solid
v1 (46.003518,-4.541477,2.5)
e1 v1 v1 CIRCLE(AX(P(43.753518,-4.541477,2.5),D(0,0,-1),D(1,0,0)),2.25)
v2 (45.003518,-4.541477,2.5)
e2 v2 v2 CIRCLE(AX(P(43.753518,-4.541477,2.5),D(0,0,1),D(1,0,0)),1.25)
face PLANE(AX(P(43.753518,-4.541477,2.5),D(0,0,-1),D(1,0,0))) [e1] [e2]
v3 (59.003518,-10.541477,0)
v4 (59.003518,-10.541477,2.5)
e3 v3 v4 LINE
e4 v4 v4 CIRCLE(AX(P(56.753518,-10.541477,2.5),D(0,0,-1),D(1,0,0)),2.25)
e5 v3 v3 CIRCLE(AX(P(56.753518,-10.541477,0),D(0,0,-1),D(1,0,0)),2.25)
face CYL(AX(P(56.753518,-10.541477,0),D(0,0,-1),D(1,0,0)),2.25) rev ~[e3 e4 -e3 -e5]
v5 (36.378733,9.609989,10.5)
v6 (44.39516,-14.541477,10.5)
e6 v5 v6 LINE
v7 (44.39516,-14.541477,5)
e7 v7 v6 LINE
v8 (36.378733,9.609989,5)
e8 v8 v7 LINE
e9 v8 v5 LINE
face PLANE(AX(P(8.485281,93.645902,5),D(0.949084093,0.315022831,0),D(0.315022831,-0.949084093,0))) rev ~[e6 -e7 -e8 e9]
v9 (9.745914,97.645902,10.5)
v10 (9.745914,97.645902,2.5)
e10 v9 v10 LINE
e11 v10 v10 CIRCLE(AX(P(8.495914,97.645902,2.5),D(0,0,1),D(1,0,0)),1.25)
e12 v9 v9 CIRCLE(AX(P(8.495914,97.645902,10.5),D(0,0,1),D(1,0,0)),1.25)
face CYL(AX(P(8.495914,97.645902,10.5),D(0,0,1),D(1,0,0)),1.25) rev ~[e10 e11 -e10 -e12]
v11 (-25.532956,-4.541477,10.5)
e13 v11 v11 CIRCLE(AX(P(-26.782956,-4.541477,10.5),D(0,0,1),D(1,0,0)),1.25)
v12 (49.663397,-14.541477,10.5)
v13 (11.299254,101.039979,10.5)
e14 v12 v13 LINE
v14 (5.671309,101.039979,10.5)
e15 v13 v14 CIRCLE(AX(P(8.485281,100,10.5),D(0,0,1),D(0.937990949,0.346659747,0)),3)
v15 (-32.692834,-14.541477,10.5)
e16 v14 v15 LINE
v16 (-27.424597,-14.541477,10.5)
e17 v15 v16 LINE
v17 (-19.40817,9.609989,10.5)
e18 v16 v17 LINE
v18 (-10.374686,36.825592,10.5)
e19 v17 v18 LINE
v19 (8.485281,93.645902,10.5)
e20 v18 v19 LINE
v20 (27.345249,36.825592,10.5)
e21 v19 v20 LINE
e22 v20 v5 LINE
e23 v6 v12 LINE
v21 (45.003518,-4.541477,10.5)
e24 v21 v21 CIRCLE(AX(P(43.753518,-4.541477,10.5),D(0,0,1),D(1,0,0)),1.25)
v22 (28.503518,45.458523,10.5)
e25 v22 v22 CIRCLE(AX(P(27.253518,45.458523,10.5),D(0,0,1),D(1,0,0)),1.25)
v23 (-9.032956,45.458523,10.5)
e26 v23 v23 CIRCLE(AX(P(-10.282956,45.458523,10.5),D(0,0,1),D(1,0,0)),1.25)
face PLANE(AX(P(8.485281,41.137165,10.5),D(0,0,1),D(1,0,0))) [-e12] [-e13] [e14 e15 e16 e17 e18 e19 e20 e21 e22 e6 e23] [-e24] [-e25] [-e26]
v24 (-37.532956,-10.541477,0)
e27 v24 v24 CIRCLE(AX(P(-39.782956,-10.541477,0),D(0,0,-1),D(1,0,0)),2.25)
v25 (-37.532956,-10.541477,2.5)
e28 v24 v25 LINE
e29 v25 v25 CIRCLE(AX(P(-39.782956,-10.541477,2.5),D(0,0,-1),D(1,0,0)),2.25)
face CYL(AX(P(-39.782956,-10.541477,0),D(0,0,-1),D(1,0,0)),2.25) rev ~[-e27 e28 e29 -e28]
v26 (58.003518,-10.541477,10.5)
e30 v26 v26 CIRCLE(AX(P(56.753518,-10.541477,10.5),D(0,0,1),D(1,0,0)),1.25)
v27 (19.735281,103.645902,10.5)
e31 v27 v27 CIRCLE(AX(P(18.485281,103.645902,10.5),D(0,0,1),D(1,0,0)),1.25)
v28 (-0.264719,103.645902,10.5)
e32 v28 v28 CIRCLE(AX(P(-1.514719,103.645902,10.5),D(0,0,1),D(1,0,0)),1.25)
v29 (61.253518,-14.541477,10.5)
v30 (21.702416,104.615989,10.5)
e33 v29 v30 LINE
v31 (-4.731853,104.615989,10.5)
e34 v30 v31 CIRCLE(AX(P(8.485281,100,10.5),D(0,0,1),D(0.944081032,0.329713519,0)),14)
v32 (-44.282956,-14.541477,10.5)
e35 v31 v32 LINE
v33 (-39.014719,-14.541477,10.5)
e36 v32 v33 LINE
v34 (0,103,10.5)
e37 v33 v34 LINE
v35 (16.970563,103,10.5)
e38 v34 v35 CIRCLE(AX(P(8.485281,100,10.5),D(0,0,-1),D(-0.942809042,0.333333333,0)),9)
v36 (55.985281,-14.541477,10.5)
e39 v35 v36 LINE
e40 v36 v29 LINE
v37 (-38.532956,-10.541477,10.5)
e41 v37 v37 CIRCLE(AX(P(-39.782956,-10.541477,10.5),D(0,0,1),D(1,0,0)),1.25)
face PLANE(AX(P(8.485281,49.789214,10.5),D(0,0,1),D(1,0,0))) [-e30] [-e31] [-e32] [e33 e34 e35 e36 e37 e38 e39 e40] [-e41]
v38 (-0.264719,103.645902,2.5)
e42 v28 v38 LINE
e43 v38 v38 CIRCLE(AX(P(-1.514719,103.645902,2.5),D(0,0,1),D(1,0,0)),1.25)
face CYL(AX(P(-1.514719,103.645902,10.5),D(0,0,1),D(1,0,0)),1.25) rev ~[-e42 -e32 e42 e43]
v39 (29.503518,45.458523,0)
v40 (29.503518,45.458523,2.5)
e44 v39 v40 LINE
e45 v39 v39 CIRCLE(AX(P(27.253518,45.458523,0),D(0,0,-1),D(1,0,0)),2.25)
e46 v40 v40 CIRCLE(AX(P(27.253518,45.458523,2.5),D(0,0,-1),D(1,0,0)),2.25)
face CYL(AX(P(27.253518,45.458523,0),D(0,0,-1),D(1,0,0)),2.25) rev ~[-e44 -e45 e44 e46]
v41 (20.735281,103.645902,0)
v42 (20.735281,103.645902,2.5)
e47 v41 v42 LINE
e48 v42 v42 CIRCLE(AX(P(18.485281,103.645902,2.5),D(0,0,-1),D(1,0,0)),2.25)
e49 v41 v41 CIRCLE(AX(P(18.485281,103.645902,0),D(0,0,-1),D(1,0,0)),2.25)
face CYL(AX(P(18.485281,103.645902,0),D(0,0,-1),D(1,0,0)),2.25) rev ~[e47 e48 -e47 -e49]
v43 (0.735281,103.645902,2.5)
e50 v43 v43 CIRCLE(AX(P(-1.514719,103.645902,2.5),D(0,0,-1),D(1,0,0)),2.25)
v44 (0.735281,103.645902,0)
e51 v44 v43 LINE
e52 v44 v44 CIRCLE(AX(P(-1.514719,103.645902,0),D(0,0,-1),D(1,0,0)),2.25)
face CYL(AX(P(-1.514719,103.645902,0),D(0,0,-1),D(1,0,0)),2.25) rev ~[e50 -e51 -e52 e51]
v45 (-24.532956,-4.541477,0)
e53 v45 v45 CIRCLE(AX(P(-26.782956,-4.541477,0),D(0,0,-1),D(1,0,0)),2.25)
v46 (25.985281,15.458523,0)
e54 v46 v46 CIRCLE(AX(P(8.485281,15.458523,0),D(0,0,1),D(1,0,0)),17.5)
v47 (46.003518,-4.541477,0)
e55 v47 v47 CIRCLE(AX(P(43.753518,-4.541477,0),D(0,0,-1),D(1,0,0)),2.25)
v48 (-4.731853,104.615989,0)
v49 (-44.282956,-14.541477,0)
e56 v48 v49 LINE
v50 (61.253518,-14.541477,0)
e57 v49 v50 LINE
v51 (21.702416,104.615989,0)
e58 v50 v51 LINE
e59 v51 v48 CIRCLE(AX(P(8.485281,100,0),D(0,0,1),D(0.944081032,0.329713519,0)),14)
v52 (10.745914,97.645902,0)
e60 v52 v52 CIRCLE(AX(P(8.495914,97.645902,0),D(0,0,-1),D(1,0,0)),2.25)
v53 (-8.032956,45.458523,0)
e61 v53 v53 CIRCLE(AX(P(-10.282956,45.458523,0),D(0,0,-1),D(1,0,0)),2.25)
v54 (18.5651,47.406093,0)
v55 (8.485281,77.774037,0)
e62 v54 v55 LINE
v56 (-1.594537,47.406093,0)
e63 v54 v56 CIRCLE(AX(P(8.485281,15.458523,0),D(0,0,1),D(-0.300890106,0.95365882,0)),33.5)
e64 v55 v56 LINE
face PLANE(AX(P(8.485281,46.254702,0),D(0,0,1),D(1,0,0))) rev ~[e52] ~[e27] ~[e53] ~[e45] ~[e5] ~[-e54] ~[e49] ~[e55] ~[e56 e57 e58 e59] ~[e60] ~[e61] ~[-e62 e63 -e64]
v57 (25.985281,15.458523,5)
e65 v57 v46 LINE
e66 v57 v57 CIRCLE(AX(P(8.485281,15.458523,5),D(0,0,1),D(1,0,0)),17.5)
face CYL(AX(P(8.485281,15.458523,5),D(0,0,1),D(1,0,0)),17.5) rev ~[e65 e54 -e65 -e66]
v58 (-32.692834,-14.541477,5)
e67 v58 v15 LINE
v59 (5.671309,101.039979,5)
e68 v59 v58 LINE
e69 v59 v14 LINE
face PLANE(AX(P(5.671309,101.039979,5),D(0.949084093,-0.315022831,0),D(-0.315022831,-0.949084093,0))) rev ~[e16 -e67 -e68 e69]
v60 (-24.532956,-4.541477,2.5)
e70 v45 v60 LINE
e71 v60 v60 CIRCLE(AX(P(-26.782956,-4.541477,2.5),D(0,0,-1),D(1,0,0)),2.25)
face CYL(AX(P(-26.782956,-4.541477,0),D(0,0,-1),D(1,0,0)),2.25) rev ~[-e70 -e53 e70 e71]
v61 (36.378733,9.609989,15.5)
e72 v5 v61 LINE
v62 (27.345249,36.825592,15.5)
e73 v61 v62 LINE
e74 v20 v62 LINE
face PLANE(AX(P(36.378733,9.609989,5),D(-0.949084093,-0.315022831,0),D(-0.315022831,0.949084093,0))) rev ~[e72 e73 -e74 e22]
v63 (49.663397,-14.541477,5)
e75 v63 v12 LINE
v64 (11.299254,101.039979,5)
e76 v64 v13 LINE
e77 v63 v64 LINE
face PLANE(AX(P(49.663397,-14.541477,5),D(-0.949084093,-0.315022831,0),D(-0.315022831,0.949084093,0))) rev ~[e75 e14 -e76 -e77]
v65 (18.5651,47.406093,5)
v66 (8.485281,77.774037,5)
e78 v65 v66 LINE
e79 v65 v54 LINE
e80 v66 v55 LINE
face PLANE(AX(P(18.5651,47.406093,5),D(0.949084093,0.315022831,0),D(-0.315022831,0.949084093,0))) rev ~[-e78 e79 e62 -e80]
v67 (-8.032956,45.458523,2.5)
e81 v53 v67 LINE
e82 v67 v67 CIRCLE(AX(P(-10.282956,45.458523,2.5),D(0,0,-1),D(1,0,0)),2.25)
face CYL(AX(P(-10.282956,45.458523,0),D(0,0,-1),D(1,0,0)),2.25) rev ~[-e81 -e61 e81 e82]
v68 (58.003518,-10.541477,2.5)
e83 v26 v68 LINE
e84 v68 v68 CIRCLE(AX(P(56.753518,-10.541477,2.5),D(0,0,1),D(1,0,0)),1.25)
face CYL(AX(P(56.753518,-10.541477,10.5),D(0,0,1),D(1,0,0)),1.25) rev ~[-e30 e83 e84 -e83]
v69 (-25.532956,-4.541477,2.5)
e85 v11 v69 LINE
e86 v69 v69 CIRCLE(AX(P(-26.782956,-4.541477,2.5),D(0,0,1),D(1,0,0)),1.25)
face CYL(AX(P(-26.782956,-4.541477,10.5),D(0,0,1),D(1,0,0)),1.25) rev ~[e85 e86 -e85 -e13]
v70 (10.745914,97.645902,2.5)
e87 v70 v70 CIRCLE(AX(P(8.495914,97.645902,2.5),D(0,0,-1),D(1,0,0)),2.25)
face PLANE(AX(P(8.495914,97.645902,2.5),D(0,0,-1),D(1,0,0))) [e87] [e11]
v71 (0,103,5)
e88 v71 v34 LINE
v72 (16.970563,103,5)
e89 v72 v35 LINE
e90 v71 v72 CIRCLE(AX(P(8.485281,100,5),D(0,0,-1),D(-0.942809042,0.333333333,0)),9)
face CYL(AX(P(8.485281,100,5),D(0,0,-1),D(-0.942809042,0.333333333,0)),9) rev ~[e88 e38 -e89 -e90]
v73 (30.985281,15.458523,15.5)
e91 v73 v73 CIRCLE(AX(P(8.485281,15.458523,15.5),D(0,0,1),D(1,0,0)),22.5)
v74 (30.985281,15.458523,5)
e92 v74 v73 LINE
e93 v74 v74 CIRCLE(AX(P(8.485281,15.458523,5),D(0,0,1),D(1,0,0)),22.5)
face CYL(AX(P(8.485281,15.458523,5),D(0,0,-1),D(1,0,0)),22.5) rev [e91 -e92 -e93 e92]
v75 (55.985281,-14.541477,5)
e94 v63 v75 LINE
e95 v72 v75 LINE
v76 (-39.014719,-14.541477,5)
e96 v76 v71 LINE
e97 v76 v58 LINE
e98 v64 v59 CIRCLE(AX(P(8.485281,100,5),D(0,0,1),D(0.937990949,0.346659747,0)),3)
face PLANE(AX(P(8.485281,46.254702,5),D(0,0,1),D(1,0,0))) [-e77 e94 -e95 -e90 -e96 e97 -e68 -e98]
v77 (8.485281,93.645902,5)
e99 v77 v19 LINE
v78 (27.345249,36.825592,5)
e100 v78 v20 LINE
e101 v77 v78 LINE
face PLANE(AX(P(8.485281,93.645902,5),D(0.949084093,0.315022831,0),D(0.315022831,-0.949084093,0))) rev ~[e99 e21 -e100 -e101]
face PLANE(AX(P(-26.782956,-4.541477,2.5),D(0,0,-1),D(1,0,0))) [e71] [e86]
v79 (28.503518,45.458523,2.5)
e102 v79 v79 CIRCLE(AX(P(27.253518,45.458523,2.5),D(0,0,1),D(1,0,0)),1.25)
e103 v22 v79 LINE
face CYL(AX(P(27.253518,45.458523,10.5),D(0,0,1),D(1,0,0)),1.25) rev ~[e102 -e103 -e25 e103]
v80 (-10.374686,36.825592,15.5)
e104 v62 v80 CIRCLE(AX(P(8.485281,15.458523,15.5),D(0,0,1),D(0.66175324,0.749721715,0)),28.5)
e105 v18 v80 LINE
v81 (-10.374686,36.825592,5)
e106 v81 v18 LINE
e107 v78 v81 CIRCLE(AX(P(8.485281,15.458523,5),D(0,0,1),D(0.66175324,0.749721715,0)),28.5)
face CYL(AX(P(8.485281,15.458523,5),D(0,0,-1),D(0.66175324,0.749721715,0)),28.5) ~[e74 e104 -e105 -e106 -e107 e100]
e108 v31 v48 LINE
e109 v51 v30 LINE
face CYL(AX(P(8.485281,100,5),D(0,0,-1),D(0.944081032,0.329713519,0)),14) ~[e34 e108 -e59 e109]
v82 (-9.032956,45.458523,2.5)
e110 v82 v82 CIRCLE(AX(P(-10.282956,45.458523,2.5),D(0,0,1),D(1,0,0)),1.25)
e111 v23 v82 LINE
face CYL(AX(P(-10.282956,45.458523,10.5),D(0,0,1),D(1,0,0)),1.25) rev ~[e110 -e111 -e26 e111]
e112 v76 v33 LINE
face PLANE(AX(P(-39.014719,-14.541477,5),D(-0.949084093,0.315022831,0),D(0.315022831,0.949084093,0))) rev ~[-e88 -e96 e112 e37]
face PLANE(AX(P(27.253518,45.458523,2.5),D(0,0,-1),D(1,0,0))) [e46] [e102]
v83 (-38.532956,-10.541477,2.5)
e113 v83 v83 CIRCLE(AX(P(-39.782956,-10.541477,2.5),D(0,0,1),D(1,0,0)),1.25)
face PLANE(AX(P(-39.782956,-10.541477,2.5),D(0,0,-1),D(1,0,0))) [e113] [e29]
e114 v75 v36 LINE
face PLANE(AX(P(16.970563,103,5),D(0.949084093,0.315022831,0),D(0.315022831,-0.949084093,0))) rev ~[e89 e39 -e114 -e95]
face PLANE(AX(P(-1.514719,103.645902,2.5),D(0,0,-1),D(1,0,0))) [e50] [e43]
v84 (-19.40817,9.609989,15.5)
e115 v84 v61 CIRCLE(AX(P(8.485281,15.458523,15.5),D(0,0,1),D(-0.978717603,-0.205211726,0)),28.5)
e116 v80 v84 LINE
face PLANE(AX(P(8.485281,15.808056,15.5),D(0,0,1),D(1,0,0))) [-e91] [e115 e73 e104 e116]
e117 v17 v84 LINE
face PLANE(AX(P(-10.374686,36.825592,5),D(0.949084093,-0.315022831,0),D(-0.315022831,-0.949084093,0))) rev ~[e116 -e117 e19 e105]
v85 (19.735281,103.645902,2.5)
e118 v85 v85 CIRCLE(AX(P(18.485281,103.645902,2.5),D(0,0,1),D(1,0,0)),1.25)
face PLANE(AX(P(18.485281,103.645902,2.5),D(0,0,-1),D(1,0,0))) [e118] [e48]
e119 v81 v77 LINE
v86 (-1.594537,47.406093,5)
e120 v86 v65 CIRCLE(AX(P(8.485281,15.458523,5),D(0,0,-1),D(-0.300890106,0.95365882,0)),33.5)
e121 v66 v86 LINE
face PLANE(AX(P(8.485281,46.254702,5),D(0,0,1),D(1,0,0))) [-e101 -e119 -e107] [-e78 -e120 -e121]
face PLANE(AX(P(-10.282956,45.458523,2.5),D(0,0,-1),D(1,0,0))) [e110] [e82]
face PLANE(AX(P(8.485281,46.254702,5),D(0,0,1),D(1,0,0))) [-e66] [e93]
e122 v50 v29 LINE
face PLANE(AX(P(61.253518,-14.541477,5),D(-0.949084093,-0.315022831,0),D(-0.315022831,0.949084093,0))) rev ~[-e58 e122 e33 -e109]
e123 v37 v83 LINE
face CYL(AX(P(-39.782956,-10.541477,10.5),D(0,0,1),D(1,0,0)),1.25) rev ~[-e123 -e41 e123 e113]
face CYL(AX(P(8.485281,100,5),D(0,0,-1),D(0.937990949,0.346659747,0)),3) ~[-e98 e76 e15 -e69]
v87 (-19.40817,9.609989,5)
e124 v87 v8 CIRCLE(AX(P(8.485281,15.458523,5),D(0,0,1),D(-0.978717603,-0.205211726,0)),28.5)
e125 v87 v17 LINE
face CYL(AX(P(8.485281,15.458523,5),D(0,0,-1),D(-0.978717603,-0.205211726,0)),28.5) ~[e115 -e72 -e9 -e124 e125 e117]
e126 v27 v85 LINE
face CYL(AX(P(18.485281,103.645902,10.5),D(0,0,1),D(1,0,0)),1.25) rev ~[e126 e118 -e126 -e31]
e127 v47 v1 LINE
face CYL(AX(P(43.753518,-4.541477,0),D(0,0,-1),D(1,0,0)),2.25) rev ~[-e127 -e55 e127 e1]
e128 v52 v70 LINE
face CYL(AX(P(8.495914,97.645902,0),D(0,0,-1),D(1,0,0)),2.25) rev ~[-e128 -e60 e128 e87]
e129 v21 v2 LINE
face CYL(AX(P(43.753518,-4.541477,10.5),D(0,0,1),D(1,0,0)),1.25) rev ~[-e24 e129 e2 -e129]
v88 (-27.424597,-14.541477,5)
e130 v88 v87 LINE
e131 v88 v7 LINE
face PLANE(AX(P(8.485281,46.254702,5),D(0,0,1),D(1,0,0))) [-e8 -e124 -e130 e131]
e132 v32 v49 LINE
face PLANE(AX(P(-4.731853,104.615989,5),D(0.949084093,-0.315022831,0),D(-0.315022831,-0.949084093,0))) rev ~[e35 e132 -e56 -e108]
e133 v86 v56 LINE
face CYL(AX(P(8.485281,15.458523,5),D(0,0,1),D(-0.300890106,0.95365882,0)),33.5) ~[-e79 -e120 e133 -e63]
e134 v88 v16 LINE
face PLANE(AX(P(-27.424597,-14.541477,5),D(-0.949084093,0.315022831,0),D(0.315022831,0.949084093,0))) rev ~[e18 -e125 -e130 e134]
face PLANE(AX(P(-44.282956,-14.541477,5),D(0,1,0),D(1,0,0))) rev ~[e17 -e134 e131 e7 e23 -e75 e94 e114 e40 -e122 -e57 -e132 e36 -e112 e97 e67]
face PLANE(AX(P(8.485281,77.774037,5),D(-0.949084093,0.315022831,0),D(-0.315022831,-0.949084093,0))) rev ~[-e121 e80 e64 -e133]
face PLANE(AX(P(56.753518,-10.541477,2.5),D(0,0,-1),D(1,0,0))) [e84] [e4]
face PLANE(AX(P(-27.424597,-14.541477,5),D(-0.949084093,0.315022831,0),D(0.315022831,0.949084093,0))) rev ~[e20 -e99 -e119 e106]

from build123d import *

# Parameters (mm, degrees)
F1_DEPTH  = 5
F3_DEPTH  = 5.5
F5_DEPTH  = 5.5
F6_R      = 22.5
F7_DEPTH  = 10.5
F8_R      = 17.5
F9_DEPTH  = 25
F11_DEPTH = 25
F12_R     = 1.25
F13_DEPTH = 11
F14_R     = 2.25
F15_DEPTH = 2.5


with BuildPart() as f1:
    # F0 (on Top) → F1 (new body)
    with BuildSketch(Plane.XY):
        with BuildLine():
            Line((50.7170443075, -14.5414772037), (55.9852813742, -14.5414772037))
            Line((55.9852813742, -14.5414772037), (16.9705627485, 103))
            ThreePointArc((16.9705627485, 103), (8.4852813742, 109), (0, 103))
            Line((0, 103), (-39.0147186258, -14.5414772037))
            Line((-39.0147186258, -14.5414772037), (-33.746481559, -14.5414772037))
            Line((-33.746481559, -14.5414772037), (4.7271265323, 101.3697708508))
            ThreePointArc((4.7271265323, 101.3697708508), (8.4852813742, 104), (12.2434362162, 101.3697708508))
            Line((12.2434362162, 101.3697708508), (50.7170443075, -14.5414772037))
        make_face()
        with BuildLine():
            Line((16.9705627485, 103), (55.9852813742, -14.5414772037))
            Line((55.9852813742, -14.5414772037), (61.253518441, -14.5414772037))
            Line((61.253518441, -14.5414772037), (21.7024158273, 104.6159892602))
            ThreePointArc((21.7024158273, 104.6159892602), (8.4852813742, 114), (-4.7318530788, 104.6159892602))
            Line((-4.7318530788, 104.6159892602), (-44.2829556925, -14.5414772037))
            Line((-44.2829556925, -14.5414772037), (-39.0147186258, -14.5414772037))
            Line((-39.0147186258, -14.5414772037), (0, 103))
            ThreePointArc((0, 103), (8.4852813742, 109), (16.9705627485, 103))
        make_face()
        with BuildLine():
            Line((-33.746481559, -14.5414772037), (50.7170443075, -14.5414772037))
            Line((50.7170443075, -14.5414772037), (12.2434362162, 101.3697708508))
            ThreePointArc((12.2434362162, 101.3697708508), (8.4852813742, 104), (4.7271265323, 101.3697708508))
            Line((4.7271265323, 101.3697708508), (-33.746481559, -14.5414772037))
        make_face()
    extrude(amount=F1_DEPTH)

    # F2 (on face) → F3 (join)
    with BuildSketch(Plane.XY.offset(5)):
        with BuildLine():
            Line((-39.0147186258, -14.5414772037), (0, 103))
            ThreePointArc((0, 103), (8.4852813742, 109), (16.9705627485, 103))
            Line((16.9705627485, 103), (55.9852813742, -14.5414772037))
            Line((55.9852813742, -14.5414772037), (61.253518441, -14.5414772037))
            Line((61.253518441, -14.5414772037), (21.7024158273, 104.6159892602))
            ThreePointArc((21.7024158273, 104.6159892602), (8.4852813742, 114), (-4.7318530788, 104.6159892602))
            Line((-4.7318530788, 104.6159892602), (-44.2829556925, -14.5414772037))
            Line((-44.2829556925, -14.5414772037), (-39.0147186258, -14.5414772037))
        make_face()
    extrude(amount=F3_DEPTH)

    # F4 (on face) → F5 (join)
    with BuildSketch(Plane.XY.offset(5)):
        with BuildLine():
            ThreePointArc((11.29925422, 101.0399792418), (8.4852813742, 103), (5.6713085285, 101.0399792418))
            Line((5.6713085285, 101.0399792418), (-32.6928341457, -14.5414772037))
            Line((-32.6928341457, -14.5414772037), (-27.424597079, -14.5414772037))
            Line((-27.424597079, -14.5414772037), (8.4852813742, 93.6459020283))
            Line((8.4852813742, 93.6459020283), (44.3951598274, -14.5414772037))
            Line((44.3951598274, -14.5414772037), (49.6633968942, -14.5414772037))
            Line((49.6633968942, -14.5414772037), (11.29925422, 101.0399792418))
        make_face()
    extrude(amount=F5_DEPTH)

    # F6 (on face) → F7 (join)
    with BuildSketch(Plane.XY.offset(5)):
        with BuildLine():
            Line((36.3787330735, 9.6099885954), (27.3452487141, 36.8255916626))
            ThreePointArc((27.3452487141, 36.8255916626), (8.4852813742, 43.9585227963), (-10.3746859657, 36.8255916626))
            Line((-10.3746859657, 36.8255916626), (-19.4081703251, 9.6099885954))
            ThreePointArc((-19.4081703251, 9.6099885954), (8.4852813742, -13.0414772037), (36.3787330735, 9.6099885954))
        make_face()
        with Locations((8.4852813742, 15.4585227963)):
            Circle(F6_R, mode=Mode.SUBTRACT)
    extrude(amount=F7_DEPTH)

    # F8 (on face) → F9 (cut)
    with BuildSketch(Plane.XY.offset(5)):
        with Locations((8.4852813742, 15.4585227963)):
            Circle(F8_R)
    extrude(amount=-F9_DEPTH, mode=Mode.SUBTRACT)

    # F10 (on face) → F11 (cut)
    with BuildSketch(Plane.XY.offset(5)):
        with BuildLine():
            Line((8.4852813742, 77.7740365146), (-1.5945371695, 47.4060932537))
            ThreePointArc((-1.5945371695, 47.4060932537), (8.4852813742, 48.9585227963), (18.5650999179, 47.4060932537))
            Line((18.5650999179, 47.4060932537), (8.4852813742, 77.7740365146))
        make_face()
    extrude(amount=-F11_DEPTH, mode=Mode.SUBTRACT)

    # F12 (on face) → F13 (cut)
    with BuildSketch(Plane.XY.offset(10.5)):
        with Locations((8.4959140697, 97.6459020283)):
            Circle(F12_R)
        with Locations((-1.5147186258, 103.6459020283)):
            Circle(F12_R)
        with Locations((18.4852813742, 103.6459020283)):
            Circle(F12_R)
        with Locations((-10.2829556925, 45.4585227963)):
            Circle(F12_R)
        with Locations((27.253518441, 45.4585227963)):
            Circle(F12_R)
        with Locations((56.753518441, -10.5414772037)):
            Circle(F12_R)
        with Locations((43.753518441, -4.5414772037)):
            Circle(F12_R)
        with Locations((-26.7829556925, -4.5414772037)):
            Circle(F12_R)
        with Locations((-39.7829556925, -10.5414772037)):
            Circle(F12_R)
    extrude(amount=-F13_DEPTH, mode=Mode.SUBTRACT)

    # F14 (on face) → F15 (cut)
    with BuildSketch(Plane(origin=(0, 0, 0), x_dir=(1, 0, 0), z_dir=(0, 0, -1))):
        with Locations((18.4852813742, -103.6459020283)):
            Circle(F14_R)
        with Locations((8.4959140697, -97.6459020283)):
            Circle(F14_R)
        with Locations((-1.5147186258, -103.6459020283)):
            Circle(F14_R)
        with Locations((-10.2829556925, -45.4585227963)):
            Circle(F14_R)
        with Locations((27.253518441, -45.4585227963)):
            Circle(F14_R)
        with Locations((-39.7829556925, 10.5414772037)):
            Circle(F14_R)
        with Locations((-26.7829556925, 4.5414772037)):
            Circle(F14_R)
        with Locations((43.753518441, 4.5414772037)):
            Circle(F14_R)
        with Locations((56.753518441, 10.5414772037)):
            Circle(F14_R)
    extrude(amount=-F15_DEPTH, mode=Mode.SUBTRACT)


solid = f1.part
